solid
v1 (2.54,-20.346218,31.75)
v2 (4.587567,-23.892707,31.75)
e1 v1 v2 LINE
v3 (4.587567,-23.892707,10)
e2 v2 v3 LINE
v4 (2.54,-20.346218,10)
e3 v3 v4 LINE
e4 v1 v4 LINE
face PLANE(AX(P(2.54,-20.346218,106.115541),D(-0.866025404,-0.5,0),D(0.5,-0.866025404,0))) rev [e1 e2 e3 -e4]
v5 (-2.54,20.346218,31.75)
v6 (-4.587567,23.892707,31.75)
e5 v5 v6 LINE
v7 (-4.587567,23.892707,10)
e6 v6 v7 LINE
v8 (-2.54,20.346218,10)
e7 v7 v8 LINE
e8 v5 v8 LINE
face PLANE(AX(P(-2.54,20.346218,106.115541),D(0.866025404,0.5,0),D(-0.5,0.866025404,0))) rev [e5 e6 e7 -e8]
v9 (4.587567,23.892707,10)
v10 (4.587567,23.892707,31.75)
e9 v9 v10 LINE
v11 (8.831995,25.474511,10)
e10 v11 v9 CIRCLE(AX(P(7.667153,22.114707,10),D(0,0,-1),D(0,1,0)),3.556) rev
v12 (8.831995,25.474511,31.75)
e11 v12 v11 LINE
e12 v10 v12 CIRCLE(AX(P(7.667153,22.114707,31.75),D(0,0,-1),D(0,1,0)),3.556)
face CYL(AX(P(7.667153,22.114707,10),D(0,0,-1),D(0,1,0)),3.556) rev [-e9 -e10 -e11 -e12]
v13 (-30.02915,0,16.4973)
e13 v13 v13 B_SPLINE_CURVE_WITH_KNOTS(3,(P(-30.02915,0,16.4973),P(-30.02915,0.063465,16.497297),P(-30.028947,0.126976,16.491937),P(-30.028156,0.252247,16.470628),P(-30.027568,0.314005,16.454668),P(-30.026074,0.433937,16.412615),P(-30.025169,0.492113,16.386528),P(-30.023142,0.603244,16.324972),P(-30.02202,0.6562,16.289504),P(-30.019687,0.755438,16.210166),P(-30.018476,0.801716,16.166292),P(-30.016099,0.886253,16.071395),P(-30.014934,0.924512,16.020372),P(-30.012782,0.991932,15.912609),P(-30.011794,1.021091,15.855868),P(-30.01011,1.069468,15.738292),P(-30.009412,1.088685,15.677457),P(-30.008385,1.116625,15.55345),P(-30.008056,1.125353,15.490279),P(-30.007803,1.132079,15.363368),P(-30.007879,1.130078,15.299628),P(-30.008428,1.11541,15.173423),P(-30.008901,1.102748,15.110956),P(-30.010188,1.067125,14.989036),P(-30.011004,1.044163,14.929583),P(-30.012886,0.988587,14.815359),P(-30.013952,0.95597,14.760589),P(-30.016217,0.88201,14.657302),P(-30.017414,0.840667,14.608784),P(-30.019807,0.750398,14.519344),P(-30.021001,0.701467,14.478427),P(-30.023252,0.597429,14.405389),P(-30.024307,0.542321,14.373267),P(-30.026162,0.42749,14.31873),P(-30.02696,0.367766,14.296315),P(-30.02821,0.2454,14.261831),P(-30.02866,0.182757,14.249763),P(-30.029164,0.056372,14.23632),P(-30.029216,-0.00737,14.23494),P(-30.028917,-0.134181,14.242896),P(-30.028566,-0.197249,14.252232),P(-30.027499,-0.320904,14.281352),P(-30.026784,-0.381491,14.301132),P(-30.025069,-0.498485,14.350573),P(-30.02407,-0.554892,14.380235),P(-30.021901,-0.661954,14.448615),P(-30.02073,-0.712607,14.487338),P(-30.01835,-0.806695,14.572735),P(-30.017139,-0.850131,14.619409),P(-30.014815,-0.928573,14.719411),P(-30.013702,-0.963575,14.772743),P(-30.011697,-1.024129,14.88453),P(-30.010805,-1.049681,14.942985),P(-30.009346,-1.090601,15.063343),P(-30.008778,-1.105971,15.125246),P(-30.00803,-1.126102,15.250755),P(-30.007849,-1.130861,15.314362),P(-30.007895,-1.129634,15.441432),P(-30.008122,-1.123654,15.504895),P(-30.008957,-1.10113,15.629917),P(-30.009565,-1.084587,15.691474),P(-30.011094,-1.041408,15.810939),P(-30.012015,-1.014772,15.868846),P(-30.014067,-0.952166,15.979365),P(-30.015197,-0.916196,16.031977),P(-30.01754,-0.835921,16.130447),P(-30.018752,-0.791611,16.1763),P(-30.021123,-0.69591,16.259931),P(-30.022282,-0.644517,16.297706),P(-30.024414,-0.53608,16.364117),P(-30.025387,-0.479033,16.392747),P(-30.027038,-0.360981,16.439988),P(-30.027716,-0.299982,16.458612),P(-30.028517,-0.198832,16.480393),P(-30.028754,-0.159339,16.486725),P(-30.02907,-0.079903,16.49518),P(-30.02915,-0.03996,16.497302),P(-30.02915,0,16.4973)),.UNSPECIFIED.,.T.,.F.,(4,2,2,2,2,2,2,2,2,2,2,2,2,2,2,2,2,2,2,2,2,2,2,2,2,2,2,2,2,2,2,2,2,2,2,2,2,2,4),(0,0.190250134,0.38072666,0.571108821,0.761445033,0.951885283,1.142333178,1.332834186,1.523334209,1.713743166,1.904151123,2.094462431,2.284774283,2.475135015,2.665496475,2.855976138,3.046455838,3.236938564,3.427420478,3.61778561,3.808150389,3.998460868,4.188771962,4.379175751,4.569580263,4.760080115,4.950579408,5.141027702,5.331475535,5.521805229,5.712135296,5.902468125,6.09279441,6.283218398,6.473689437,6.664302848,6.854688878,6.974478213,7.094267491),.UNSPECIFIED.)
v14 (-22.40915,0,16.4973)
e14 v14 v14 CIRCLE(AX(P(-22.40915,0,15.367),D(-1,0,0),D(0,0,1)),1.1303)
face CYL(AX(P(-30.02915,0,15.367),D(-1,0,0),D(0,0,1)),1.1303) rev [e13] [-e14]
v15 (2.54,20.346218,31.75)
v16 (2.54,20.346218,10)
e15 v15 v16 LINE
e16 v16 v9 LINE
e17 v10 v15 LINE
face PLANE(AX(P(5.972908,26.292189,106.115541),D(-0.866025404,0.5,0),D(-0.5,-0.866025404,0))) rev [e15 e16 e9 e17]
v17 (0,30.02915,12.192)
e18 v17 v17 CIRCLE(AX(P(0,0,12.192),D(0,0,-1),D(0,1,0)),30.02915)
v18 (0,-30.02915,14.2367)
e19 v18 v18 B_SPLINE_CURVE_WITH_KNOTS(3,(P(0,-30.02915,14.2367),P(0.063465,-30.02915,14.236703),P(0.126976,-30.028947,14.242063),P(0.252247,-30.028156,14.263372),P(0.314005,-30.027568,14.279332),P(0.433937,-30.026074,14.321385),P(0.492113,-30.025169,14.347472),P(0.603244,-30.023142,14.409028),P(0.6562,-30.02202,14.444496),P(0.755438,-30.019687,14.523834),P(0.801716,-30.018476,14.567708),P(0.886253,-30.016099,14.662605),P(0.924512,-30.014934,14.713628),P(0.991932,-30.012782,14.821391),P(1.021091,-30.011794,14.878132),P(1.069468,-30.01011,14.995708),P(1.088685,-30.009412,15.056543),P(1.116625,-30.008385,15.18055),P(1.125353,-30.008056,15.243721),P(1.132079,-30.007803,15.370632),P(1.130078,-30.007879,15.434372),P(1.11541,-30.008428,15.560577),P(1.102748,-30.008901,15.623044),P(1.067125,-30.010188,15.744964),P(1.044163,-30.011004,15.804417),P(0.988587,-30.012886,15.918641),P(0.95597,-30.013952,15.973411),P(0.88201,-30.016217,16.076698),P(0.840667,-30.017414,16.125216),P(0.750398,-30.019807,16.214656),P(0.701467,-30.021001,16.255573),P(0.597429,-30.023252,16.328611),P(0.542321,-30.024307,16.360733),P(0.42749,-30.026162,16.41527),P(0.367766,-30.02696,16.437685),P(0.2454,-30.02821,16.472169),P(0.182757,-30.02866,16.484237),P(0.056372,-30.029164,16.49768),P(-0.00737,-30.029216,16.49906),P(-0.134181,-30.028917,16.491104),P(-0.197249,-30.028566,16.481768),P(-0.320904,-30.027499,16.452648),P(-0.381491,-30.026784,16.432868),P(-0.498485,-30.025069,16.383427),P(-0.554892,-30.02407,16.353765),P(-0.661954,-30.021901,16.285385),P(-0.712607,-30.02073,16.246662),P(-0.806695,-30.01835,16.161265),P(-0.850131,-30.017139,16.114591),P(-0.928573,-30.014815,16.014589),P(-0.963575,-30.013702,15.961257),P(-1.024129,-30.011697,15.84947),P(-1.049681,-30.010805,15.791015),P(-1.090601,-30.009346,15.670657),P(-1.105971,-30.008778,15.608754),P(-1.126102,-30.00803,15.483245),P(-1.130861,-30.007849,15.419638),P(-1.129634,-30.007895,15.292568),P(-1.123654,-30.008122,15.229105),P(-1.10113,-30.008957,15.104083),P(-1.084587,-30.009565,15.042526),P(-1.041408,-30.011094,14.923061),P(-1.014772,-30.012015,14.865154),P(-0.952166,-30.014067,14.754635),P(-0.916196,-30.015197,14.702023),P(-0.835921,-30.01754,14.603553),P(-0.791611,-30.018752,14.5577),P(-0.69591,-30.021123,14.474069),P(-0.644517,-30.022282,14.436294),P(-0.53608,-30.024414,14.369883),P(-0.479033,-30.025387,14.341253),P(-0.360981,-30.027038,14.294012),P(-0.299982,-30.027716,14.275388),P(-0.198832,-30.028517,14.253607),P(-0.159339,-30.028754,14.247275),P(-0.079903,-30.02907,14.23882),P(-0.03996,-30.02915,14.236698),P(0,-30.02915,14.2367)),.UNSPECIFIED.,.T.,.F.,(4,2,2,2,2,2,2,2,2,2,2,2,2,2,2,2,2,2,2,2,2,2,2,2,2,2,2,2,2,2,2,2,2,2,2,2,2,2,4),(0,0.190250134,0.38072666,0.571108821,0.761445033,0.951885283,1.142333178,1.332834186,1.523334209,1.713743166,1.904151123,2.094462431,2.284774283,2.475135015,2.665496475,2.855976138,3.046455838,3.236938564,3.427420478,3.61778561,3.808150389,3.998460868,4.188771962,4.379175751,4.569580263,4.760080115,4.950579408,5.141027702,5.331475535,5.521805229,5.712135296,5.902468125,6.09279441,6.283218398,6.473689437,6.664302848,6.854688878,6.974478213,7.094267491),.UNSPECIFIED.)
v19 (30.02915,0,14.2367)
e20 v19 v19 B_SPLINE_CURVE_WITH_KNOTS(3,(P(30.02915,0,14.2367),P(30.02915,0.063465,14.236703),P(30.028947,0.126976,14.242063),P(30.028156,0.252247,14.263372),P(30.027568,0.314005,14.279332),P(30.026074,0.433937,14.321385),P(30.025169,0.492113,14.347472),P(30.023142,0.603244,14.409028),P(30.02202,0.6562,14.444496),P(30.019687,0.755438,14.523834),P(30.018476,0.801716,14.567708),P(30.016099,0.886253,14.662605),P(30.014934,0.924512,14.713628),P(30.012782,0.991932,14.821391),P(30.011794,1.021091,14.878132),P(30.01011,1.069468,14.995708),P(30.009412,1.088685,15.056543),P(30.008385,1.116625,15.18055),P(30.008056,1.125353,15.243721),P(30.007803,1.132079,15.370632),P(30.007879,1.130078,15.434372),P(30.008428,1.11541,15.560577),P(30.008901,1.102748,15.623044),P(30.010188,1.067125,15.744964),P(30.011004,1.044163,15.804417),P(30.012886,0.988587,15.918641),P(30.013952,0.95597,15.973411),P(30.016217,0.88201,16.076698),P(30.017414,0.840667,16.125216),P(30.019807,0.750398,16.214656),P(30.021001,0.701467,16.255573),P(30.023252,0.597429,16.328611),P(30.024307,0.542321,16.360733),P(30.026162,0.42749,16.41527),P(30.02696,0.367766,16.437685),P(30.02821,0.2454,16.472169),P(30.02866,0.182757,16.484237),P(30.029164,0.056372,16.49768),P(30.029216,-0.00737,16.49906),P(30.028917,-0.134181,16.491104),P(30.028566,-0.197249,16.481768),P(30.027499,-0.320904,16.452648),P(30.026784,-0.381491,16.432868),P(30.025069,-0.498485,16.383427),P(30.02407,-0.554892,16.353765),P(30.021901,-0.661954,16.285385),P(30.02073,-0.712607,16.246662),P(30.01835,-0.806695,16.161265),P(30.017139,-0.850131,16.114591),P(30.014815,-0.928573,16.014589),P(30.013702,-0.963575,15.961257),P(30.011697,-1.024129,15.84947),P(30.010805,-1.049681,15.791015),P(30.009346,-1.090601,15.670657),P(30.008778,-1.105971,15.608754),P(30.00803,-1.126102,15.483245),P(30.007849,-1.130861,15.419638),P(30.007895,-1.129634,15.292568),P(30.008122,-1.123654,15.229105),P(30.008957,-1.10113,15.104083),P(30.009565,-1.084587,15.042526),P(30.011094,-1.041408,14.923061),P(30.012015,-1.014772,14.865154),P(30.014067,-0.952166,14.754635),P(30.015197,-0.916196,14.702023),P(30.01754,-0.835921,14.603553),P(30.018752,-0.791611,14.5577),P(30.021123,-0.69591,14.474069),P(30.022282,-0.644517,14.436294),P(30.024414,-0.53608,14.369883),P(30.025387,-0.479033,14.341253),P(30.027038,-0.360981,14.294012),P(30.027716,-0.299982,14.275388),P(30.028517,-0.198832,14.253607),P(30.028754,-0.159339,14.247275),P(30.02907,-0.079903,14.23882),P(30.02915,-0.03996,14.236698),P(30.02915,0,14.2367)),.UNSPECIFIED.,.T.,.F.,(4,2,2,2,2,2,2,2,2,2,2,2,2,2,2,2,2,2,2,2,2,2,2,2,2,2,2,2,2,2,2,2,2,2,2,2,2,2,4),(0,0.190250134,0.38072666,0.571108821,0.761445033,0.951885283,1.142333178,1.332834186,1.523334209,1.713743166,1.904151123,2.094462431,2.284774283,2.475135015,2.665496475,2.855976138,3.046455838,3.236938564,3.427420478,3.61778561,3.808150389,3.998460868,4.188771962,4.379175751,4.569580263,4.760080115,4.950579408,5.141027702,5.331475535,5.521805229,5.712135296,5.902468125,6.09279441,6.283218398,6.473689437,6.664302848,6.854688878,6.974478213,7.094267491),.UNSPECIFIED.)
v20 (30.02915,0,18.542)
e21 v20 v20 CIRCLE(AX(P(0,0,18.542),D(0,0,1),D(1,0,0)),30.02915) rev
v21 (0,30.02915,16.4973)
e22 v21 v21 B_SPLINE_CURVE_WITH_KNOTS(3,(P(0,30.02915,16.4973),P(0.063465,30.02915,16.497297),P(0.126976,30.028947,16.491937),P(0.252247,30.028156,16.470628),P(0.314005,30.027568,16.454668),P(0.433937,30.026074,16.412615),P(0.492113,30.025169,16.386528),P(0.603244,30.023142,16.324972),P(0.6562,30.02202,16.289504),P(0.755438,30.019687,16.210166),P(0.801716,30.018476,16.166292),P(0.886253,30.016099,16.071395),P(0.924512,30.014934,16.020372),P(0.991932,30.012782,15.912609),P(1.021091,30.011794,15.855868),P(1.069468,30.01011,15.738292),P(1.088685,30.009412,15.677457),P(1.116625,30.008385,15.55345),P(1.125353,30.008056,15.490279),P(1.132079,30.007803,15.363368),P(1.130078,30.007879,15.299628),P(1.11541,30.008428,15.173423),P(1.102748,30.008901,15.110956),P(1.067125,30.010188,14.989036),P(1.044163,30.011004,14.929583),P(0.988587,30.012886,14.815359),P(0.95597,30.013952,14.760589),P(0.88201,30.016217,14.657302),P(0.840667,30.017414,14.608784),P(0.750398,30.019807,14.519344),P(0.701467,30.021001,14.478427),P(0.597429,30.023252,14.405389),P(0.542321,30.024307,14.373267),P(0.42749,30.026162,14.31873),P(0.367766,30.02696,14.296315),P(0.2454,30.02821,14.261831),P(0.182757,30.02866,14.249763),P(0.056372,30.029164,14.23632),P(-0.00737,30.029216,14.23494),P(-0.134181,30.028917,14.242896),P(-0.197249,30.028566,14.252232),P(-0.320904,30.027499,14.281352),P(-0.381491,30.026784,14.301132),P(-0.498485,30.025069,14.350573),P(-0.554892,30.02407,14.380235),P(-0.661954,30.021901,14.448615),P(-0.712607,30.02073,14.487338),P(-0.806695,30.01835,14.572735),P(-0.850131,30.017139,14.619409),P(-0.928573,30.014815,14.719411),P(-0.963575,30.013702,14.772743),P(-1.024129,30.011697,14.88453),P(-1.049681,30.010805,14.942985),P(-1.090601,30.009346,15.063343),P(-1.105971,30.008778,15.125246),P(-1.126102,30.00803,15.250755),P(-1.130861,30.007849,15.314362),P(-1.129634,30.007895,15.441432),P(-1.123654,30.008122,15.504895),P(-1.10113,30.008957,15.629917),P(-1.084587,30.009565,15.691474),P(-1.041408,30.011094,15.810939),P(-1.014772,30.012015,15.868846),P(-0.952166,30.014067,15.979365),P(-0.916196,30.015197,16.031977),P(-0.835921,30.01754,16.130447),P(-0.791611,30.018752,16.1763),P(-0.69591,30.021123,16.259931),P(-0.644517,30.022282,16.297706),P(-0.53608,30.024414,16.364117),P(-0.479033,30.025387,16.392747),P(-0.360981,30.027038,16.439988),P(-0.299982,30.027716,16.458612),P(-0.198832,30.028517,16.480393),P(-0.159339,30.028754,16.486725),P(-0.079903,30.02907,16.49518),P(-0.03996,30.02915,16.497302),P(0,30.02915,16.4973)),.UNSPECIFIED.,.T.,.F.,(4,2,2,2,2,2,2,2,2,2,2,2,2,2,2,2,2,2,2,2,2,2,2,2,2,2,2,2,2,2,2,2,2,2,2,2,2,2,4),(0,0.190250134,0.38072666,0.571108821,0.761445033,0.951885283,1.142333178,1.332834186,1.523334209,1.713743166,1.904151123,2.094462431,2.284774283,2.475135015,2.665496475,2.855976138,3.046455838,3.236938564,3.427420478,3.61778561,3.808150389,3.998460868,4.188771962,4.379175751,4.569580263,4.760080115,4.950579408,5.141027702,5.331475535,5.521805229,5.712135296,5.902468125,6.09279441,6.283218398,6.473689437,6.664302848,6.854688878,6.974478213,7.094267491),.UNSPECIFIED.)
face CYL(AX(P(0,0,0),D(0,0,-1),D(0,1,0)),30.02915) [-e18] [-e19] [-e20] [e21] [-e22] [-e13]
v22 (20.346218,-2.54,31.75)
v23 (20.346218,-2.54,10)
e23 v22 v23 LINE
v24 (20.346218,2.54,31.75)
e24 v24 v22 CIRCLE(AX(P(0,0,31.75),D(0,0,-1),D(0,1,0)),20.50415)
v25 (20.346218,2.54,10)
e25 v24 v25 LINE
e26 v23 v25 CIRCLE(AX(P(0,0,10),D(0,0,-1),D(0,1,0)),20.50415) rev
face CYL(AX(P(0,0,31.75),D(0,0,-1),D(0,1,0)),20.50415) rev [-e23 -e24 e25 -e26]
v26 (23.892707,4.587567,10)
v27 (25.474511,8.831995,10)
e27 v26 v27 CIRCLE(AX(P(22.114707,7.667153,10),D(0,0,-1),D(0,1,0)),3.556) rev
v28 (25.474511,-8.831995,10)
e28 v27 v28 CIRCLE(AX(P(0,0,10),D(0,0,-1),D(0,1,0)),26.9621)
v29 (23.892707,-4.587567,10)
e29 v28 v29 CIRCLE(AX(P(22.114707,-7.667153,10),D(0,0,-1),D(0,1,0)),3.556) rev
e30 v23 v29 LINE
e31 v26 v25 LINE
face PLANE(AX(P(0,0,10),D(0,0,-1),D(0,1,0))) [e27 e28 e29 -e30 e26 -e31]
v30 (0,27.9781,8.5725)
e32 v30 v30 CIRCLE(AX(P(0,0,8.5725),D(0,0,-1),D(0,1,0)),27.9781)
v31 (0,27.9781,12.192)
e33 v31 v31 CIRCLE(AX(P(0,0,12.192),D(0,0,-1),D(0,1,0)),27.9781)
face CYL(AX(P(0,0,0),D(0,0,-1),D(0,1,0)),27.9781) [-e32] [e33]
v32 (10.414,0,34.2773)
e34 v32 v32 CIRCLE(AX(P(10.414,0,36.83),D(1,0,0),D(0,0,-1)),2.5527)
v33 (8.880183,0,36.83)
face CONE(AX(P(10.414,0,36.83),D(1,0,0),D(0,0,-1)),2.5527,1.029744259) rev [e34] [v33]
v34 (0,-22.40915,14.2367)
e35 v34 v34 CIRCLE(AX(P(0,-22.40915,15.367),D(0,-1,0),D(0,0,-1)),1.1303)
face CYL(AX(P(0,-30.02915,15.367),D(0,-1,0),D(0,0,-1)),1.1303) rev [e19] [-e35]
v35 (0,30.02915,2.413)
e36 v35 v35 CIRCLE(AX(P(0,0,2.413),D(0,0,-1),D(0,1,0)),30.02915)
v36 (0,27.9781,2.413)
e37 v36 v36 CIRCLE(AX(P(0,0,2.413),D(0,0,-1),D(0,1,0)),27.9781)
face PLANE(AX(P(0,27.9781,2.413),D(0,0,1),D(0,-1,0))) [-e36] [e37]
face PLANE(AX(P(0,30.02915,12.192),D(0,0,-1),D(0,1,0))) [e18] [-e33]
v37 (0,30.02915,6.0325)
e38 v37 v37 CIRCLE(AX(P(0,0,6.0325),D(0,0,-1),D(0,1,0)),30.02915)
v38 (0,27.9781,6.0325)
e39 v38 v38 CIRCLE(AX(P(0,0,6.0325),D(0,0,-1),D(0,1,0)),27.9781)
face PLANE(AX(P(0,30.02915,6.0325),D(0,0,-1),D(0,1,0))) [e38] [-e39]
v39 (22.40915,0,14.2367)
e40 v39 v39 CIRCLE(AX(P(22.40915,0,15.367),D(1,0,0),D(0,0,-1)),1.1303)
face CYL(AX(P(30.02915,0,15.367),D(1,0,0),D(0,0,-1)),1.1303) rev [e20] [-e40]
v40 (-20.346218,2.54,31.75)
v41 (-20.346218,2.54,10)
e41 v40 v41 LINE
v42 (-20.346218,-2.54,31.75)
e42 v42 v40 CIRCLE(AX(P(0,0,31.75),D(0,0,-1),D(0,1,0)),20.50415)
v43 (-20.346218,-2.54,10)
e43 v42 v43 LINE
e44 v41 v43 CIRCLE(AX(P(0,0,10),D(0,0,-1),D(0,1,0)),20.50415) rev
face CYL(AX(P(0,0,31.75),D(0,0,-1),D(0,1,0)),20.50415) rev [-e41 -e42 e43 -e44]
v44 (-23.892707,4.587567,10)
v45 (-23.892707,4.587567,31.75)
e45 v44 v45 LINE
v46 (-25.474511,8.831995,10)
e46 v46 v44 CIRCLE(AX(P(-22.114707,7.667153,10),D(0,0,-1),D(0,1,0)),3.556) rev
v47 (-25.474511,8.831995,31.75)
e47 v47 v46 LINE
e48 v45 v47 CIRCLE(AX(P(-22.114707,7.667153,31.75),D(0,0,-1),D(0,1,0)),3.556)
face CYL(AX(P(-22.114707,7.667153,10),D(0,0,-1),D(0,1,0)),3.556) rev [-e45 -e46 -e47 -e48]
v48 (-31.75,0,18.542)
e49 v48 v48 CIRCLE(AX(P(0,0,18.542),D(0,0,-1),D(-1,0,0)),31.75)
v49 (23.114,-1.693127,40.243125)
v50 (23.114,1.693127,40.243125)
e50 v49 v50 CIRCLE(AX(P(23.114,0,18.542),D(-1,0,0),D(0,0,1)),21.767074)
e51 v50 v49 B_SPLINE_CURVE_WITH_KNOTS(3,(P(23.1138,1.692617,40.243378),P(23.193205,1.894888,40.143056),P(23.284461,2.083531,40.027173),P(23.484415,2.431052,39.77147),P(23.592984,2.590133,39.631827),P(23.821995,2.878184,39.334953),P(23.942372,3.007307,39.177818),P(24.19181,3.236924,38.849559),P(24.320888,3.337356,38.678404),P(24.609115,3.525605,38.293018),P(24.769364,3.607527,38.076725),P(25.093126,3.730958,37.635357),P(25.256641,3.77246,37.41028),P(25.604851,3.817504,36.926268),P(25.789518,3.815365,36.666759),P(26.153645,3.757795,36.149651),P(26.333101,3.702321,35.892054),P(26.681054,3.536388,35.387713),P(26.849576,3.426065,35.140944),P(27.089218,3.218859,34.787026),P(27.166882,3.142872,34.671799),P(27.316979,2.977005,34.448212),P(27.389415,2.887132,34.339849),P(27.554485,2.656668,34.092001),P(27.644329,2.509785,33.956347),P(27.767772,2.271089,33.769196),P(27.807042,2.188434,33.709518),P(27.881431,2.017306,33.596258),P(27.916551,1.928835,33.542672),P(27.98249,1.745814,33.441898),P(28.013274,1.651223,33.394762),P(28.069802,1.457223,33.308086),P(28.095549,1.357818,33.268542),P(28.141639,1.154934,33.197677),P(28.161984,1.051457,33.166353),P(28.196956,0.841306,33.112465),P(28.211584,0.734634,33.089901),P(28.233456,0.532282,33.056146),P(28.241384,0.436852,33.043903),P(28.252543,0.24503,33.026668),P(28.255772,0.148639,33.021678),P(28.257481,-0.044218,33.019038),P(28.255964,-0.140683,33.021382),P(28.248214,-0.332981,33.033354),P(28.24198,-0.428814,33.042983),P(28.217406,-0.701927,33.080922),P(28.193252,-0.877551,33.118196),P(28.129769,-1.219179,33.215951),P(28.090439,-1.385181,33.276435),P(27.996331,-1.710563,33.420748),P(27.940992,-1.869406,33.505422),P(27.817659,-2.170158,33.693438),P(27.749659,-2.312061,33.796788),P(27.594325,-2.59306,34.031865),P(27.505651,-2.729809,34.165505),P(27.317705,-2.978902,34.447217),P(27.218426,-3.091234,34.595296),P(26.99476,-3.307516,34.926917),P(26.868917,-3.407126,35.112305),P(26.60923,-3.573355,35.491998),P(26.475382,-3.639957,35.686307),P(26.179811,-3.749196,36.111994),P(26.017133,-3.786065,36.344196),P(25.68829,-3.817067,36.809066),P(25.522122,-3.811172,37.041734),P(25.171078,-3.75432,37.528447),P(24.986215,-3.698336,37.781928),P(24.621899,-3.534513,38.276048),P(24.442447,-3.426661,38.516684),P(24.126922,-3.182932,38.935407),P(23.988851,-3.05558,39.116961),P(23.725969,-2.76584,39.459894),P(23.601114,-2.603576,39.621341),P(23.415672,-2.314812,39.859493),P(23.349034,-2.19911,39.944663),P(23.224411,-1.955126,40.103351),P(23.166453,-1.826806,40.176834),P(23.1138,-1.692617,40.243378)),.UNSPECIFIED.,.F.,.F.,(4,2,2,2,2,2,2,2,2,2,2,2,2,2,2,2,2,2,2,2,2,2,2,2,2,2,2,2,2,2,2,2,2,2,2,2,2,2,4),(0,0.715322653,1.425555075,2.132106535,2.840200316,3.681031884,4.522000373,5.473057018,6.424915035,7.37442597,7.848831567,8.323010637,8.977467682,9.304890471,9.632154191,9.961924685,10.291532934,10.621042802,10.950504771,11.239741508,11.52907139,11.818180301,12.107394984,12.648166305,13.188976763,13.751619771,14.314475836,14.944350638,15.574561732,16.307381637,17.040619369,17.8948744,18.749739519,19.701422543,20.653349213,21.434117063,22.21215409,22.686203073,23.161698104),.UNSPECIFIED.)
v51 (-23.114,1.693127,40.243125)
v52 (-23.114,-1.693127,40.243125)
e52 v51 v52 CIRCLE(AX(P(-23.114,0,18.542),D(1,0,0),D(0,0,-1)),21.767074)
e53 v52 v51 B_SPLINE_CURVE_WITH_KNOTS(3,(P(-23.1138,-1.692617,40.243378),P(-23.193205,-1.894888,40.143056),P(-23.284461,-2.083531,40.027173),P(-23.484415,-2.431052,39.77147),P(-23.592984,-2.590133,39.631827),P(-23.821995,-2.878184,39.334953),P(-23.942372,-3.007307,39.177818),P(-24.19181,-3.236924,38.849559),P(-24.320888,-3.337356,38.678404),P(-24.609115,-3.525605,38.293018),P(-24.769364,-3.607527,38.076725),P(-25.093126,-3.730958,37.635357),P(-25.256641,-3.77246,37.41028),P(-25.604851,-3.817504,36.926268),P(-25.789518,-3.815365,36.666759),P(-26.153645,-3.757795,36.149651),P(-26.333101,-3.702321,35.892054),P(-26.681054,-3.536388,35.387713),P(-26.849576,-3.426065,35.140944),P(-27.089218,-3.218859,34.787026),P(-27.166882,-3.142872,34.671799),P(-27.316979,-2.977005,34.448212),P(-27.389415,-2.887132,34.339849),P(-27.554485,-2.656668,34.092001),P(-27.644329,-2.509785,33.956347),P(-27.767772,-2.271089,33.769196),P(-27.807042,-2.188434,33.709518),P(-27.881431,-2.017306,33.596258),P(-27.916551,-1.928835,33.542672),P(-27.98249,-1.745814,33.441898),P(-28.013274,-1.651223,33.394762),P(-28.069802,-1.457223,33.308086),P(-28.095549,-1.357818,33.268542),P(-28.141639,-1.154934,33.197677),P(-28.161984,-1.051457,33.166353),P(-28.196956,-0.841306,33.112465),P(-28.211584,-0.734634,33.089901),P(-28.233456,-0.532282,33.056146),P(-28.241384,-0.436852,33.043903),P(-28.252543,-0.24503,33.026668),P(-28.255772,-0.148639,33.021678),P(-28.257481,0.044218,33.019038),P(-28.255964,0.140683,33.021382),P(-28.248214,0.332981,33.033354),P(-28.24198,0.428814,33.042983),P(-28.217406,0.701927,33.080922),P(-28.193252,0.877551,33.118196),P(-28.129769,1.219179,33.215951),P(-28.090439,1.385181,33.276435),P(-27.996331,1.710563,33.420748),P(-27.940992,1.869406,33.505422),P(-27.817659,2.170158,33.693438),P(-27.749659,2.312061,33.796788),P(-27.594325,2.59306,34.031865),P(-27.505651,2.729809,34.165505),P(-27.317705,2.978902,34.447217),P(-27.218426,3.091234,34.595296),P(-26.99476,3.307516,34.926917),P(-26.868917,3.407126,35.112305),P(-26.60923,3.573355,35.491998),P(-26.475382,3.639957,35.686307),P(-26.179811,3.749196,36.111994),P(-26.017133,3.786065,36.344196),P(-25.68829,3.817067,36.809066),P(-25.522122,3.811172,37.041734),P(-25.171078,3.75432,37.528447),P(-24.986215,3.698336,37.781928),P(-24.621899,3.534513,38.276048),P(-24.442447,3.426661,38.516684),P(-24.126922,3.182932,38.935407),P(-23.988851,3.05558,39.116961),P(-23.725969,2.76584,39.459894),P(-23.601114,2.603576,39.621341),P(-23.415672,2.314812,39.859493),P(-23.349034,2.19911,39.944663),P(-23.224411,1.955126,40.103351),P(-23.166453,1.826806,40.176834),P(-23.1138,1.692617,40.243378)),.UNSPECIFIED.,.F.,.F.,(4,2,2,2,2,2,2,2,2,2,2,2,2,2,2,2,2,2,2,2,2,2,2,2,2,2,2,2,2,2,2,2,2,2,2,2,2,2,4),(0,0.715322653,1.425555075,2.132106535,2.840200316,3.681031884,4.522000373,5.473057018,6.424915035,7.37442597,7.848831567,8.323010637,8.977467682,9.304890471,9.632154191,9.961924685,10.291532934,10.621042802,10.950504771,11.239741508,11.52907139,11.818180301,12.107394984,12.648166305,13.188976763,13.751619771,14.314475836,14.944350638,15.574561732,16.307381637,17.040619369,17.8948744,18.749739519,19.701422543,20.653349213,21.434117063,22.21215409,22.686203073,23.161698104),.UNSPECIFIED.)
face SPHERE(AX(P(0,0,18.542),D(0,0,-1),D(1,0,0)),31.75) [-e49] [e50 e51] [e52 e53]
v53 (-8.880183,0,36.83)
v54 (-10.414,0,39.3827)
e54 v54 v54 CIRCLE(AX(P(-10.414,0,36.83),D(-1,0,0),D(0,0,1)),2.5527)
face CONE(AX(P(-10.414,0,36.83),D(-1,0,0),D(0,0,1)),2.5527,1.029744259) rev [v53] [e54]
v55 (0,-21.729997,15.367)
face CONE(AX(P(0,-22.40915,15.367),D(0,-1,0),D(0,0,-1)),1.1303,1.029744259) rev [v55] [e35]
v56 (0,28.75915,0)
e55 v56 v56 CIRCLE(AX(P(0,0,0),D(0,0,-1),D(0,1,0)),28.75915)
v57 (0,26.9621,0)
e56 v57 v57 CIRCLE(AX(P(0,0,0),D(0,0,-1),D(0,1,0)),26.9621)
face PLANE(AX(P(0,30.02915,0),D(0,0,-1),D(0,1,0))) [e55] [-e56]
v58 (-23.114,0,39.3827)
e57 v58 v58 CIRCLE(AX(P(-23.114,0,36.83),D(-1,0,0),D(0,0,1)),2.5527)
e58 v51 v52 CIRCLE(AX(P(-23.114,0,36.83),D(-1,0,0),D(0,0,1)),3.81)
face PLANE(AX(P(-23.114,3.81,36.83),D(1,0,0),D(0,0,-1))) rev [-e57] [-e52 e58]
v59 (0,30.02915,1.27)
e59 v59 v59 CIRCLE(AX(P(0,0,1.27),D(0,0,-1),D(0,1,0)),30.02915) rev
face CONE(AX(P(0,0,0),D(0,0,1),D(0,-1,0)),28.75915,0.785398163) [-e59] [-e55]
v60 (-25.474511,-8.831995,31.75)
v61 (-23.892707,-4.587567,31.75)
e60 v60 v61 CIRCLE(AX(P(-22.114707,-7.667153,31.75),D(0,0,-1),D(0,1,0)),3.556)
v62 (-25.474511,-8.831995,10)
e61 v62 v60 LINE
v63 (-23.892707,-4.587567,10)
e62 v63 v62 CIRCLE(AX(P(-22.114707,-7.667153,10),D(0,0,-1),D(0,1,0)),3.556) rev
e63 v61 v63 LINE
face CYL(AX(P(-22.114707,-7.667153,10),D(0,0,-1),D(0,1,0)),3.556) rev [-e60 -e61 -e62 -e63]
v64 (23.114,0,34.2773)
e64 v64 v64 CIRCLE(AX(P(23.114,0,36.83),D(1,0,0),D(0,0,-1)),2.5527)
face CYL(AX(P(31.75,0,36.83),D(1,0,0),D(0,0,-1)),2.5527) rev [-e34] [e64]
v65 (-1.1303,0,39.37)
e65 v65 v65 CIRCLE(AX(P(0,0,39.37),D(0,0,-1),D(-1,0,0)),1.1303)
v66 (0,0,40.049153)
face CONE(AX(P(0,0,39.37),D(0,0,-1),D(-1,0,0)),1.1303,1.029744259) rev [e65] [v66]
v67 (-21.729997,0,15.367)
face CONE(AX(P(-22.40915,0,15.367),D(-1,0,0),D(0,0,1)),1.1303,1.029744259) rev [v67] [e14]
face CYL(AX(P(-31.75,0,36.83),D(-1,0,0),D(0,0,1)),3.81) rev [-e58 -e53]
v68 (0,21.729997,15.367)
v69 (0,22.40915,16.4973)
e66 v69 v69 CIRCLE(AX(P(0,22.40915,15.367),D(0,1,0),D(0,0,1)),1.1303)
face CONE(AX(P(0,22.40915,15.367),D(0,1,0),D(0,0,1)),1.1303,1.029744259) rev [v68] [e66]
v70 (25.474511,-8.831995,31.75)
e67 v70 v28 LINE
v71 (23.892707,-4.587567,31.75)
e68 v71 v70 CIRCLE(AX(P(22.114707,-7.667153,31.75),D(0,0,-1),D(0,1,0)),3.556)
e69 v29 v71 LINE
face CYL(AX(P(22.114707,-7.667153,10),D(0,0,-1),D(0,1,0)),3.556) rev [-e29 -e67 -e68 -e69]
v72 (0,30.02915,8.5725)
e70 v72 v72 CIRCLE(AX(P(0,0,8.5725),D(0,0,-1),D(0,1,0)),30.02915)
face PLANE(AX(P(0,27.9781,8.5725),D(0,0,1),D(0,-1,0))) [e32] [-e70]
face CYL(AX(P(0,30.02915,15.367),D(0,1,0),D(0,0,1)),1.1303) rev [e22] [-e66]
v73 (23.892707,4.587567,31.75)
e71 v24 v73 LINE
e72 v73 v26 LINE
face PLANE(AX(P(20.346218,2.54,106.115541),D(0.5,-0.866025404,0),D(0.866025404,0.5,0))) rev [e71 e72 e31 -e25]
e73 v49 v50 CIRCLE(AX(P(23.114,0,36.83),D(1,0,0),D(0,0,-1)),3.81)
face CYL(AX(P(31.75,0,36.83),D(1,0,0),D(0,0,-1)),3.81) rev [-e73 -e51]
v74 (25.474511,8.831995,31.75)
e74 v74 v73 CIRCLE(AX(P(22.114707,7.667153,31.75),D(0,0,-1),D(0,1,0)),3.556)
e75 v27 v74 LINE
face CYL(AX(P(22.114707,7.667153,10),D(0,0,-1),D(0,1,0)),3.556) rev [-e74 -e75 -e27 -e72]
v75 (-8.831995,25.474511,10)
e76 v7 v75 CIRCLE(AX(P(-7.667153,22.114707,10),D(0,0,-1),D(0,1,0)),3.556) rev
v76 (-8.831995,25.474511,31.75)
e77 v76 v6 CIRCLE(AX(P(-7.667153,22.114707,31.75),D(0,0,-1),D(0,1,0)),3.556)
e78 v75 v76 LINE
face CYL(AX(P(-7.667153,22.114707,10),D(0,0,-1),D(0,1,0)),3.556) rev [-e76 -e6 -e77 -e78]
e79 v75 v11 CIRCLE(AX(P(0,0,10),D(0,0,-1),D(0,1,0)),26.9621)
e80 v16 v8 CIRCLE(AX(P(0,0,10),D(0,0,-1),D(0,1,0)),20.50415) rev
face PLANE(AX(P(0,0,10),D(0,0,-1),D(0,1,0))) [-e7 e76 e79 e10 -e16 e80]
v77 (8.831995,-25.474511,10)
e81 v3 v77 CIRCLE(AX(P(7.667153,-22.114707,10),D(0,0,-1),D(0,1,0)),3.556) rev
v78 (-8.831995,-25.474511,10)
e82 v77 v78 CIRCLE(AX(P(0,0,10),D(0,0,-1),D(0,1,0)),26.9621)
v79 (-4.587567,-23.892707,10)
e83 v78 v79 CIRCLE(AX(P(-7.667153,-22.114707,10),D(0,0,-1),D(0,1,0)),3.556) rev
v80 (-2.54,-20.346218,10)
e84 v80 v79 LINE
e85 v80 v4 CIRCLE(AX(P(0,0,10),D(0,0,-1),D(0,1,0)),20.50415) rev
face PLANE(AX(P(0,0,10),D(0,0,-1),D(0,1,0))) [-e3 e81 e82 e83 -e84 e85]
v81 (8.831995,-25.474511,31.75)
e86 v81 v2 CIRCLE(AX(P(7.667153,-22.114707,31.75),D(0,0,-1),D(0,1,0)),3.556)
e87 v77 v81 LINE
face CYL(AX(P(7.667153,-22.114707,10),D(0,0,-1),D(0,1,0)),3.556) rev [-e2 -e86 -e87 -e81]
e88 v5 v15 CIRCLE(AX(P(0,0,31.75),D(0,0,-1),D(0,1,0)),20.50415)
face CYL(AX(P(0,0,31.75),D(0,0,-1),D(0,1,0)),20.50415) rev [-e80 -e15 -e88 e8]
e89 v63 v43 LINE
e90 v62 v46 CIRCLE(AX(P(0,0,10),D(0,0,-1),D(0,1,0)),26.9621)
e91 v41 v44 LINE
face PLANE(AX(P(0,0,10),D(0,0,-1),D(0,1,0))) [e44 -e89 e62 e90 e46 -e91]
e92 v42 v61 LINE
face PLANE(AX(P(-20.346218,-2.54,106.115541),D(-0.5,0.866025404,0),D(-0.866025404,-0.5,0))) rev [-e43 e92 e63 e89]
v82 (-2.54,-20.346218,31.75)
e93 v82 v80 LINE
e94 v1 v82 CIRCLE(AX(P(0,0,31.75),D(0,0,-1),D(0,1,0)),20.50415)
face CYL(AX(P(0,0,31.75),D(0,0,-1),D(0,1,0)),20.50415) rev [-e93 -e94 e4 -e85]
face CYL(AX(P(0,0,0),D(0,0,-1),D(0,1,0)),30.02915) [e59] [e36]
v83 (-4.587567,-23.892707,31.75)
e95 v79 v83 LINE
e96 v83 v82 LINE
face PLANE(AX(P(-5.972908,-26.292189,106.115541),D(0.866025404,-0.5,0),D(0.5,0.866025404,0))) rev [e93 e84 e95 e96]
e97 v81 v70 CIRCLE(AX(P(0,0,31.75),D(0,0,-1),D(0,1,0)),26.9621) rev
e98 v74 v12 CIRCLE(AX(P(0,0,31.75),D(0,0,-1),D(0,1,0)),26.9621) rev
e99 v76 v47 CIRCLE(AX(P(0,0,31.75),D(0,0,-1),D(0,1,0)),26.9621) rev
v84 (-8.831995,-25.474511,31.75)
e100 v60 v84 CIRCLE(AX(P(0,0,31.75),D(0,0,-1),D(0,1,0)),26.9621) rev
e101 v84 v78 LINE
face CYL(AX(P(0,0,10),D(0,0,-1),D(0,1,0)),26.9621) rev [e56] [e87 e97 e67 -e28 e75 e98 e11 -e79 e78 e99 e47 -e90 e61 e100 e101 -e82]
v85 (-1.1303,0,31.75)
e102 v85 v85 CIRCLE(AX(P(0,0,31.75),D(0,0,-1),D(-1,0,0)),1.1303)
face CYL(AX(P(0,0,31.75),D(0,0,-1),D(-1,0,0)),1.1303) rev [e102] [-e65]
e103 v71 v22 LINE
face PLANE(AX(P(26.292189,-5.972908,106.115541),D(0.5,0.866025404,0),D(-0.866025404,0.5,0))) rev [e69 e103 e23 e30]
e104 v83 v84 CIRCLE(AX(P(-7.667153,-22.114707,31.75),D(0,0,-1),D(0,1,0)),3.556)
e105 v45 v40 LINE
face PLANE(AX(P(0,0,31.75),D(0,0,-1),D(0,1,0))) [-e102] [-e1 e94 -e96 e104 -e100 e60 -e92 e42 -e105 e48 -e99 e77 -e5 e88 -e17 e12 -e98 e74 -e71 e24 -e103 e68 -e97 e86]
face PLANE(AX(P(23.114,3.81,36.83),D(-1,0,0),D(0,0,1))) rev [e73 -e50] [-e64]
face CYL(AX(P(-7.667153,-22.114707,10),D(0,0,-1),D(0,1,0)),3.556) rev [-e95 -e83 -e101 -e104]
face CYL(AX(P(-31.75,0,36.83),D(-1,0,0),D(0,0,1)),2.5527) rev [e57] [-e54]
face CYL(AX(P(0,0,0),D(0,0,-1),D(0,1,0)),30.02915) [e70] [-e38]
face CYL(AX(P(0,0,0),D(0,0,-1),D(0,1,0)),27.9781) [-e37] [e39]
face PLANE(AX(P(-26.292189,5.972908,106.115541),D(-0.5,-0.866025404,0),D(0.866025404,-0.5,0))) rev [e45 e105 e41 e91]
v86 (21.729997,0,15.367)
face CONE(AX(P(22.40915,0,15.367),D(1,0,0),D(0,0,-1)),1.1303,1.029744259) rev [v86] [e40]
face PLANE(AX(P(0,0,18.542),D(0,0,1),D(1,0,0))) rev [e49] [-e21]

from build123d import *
from build123d.topology import SkipClean

# Parameters (mm, degrees)
F_4_40_TAPPED_HOLE1_D               = 2.2606
F_4_40_TAPPED_HOLE1_DEPTH           = 7.62
F_4_40_TAPPED_HOLE1_TIP             = 0.679152758
F_4_40_TAPPED_HOLE1_ON_FACE_2_D     = 2.2606
F_4_40_TAPPED_HOLE1_ON_FACE_2_DEPTH = 7.62
F_4_40_TAPPED_HOLE1_ON_FACE_2_TIP   = 0.679152758
F_4_40_TAPPED_HOLE1_ON_FACE_3_D     = 2.2606
F_4_40_TAPPED_HOLE1_ON_FACE_3_DEPTH = 7.62
F_4_40_TAPPED_HOLE1_ON_FACE_3_TIP   = 0.679152758
F_4_40_TAPPED_HOLE1_ON_FACE_4_D     = 2.2606
F_4_40_TAPPED_HOLE1_ON_FACE_4_DEPTH = 7.62
F_4_40_TAPPED_HOLE1_ON_FACE_4_TIP   = 0.679152758
SKETCH10_R                          = 20.50415
CUT_EXTRUDE3_DEPTH                  = 31.75
F_4_40_TAPPED_HOLE2_D               = 2.2606
F_4_40_TAPPED_HOLE2_DEPTH           = 7.62
F_4_40_TAPPED_HOLE2_TIP             = 0.679152758
CHAMFER1_SIZE                       = 1.27
SKETCH23_R                          = 26.9621
CUT_EXTRUDE6_DEPTH                  = 10
CUT_EXTRUDE7_DEPTH                  = 21.75
FILLET2_R                           = 3.556


# Read off the part's stored shape, not the designer's step: AdvancedHole3
with BuildPart() as part:
    # Sketch2 → Revolve1 (revolve)
    with BuildSketch(Plane(origin=(0, 0, 0), x_dir=(0, 0, -1), z_dir=(1, 0, 0))):
        Polygon((-18.542, 30.02915), (-12.192, 30.02915), (-12.192, 27.9781), (-8.5725, 27.9781), (-8.5725, 30.02915), (-6.0325, 30.02915), (-6.0325, 27.9781), (-2.413, 27.9781), (-2.413, 30.02915), (0, 30.02915), (0, 0), (-18.542, 0), align=None)
    revolve(axis=Axis((0, 0, 0), (0, 0, 1)))

    # #4-40 Tapped Hole1
    with Locations(Plane(origin=(0, -30.02915, 15.367), x_dir=(0, 0, -1), z_dir=(0, -1, 0))):
        with Locations((0, 0)):
            Hole(F_4_40_TAPPED_HOLE1_D / 2, depth=F_4_40_TAPPED_HOLE1_DEPTH)
            with Locations((0, 0, -(F_4_40_TAPPED_HOLE1_DEPTH + F_4_40_TAPPED_HOLE1_TIP / 2))):  # 118° drill point
                Cone(0, F_4_40_TAPPED_HOLE1_D / 2, F_4_40_TAPPED_HOLE1_TIP, mode=Mode.SUBTRACT)

    # #4-40 Tapped Hole1 on face 2
    with Locations(Plane(origin=(30.02915, 0, 15.367), x_dir=(0, 0, 1), z_dir=(1, 0, 0))):
        with Locations((0, 0)):
            Hole(F_4_40_TAPPED_HOLE1_ON_FACE_2_D / 2, depth=F_4_40_TAPPED_HOLE1_ON_FACE_2_DEPTH)
            with Locations((0, 0, -(F_4_40_TAPPED_HOLE1_ON_FACE_2_DEPTH + F_4_40_TAPPED_HOLE1_ON_FACE_2_TIP / 2))):  # 118° drill point
                Cone(0, F_4_40_TAPPED_HOLE1_ON_FACE_2_D / 2, F_4_40_TAPPED_HOLE1_ON_FACE_2_TIP, mode=Mode.SUBTRACT)

    # #4-40 Tapped Hole1 on face 3
    with Locations(Plane(origin=(-30.02915, 0, 15.367), x_dir=(0, 0, -1), z_dir=(-1, 0, 0))):
        with Locations((0, 0)):
            Hole(F_4_40_TAPPED_HOLE1_ON_FACE_3_D / 2, depth=F_4_40_TAPPED_HOLE1_ON_FACE_3_DEPTH)
            with Locations((0, 0, -(F_4_40_TAPPED_HOLE1_ON_FACE_3_DEPTH + F_4_40_TAPPED_HOLE1_ON_FACE_3_TIP / 2))):  # 118° drill point
                Cone(0, F_4_40_TAPPED_HOLE1_ON_FACE_3_D / 2, F_4_40_TAPPED_HOLE1_ON_FACE_3_TIP, mode=Mode.SUBTRACT)

    # #4-40 Tapped Hole1 on face 4
    with Locations(Plane(origin=(0, 30.02915, 15.367), x_dir=(0, 0, 1), z_dir=(0, 1, 0))):
        with Locations((0, 0)):
            Hole(F_4_40_TAPPED_HOLE1_ON_FACE_4_D / 2, depth=F_4_40_TAPPED_HOLE1_ON_FACE_4_DEPTH)
            with Locations((0, 0, -(F_4_40_TAPPED_HOLE1_ON_FACE_4_DEPTH + F_4_40_TAPPED_HOLE1_ON_FACE_4_TIP / 2))):  # 118° drill point
                Cone(0, F_4_40_TAPPED_HOLE1_ON_FACE_4_D / 2, F_4_40_TAPPED_HOLE1_ON_FACE_4_TIP, mode=Mode.SUBTRACT)

    # Sketch6 → Revolve2 (revolve)
    with BuildSketch(Plane(origin=(0, 0, 0), x_dir=(1, 0, 0), z_dir=(0, 1, 0)), mode=Mode.PRIVATE) as revolve2_sk:
        with BuildLine():
            Line((0, -18.542), (31.75, -18.542))
            ThreePointArc((31.75, -18.542), (22.450640303, -40.992640303), (0, -50.292))
            Line((0, -50.292), (0, -18.542))
        make_face()
    revolve(revolve2_sk.sketch.rotate(Axis((0, 0, 18.542), (0, 0, 1)), 90), axis=Axis((0, 0, 18.542), (0, 0, 1)))

    # Sketch10 → Cut-Extrude3 (cut)
    with BuildSketch(Plane(origin=(0, 0, 0), x_dir=(-1, 0, 0), z_dir=(0, 0, -1))):
        with Locations(Location((0, 0, 0), (0, 0, 90))):
            Circle(SKETCH10_R)
    extrude(amount=-CUT_EXTRUDE3_DEPTH, mode=Mode.SUBTRACT)

    # #4-40 Tapped Hole2
    with Locations(Plane(origin=(0, 0, 31.75), x_dir=(-1, 0, 0), z_dir=(0, 0, -1))):
        with Locations((0, 0)):
            Hole(F_4_40_TAPPED_HOLE2_D / 2, depth=F_4_40_TAPPED_HOLE2_DEPTH)
            with Locations((0, 0, -(F_4_40_TAPPED_HOLE2_DEPTH + F_4_40_TAPPED_HOLE2_TIP / 2))):  # 118° drill point
                Cone(0, F_4_40_TAPPED_HOLE2_D / 2, F_4_40_TAPPED_HOLE2_TIP, mode=Mode.SUBTRACT)

    # Chamfer1
    chamfer1_edges = [part.edges().sort_by_distance(p)[0] for p in [
        (0, -30.02915, 0),
    ]]
    chamfer(chamfer1_edges, length=CHAMFER1_SIZE)

    # AdvancedHole3 outline → AdvancedHole3 (revolve, cut)
    with BuildSketch(Plane.YX.offset(-36.83)):
        Polygon((3.81, 28.256858344), (0, 28.256858344), (0, 8.880183098), (2.5527, 10.414), (2.5527, 23.114), (3.81, 23.114), align=None)
    advancedhole3 = revolve(axis=Axis((0, 0, 36.83), (1, 0, 0)), mode=Mode.SUBTRACT)

    # Mirror2: AdvancedHole3 across plane
    add(advancedhole3.mirror(Plane(origin=(0, 0, 0), x_dir=(0, 0, 1), z_dir=(1, 0, 0))), mode=Mode.SUBTRACT)

    # Sketch23 → Cut-Extrude6 (cut)
    with BuildSketch(Plane(origin=(0, 0, 0), x_dir=(-1, 0, 0), z_dir=(0, 0, -1))):
        with Locations(Location((0, 0, 0), (0, 0, 90))):
            Circle(SKETCH23_R)
    extrude(amount=-CUT_EXTRUDE6_DEPTH, mode=Mode.SUBTRACT)

    # Sketch24 → Cut-Extrude7 (cut)
    with SkipClean():  # the faces are left unmerged after this step: merging them gives an invalid solid
        with BuildSketch(Plane(origin=(0, 0, 10), x_dir=(-1, 0, 0), z_dir=(0, 0, -1))):
            with BuildLine():
                Line((-5.972908248, 26.29218902), (-2.54, 20.346217516))
                Line((-2.54, 20.346217516), (2.54, 20.346217516))
                Line((2.54, 20.346217516), (5.972908248, 26.29218902))
                ThreePointArc((5.972908248, 26.29218902), (19.065083745, 19.065083745), (26.29218902, 5.972908248))
                Line((26.29218902, 5.972908248), (20.346217516, 2.54))
                Line((20.346217516, 2.54), (20.346217516, -2.54))
                Line((20.346217516, -2.54), (26.29218902, -5.972908248))
                ThreePointArc((26.29218902, -5.972908248), (19.065083745, -19.065083745), (5.972908248, -26.29218902))
                Line((5.972908248, -26.29218902), (2.54, -20.346217516))
                Line((2.54, -20.346217516), (-2.54, -20.346217516))
                Line((-2.54, -20.346217516), (-5.972908248, -26.29218902))
                ThreePointArc((-5.972908248, -26.29218902), (-19.065083745, -19.065083745), (-26.29218902, -5.972908248))
                Line((-26.29218902, -5.972908248), (-20.346217516, -2.54))
                Line((-20.346217516, -2.54), (-20.346217516, 2.54))
                Line((-20.346217516, 2.54), (-26.29218902, 5.972908248))
                ThreePointArc((-26.29218902, 5.972908248), (-19.065083745, 19.065083745), (-5.972908248, 26.29218902))
            make_face()
        extrude(amount=-CUT_EXTRUDE7_DEPTH, mode=Mode.SUBTRACT)

    # Fillet2
    fillet2_edges = [part.edges().sort_by_distance(p)[0] for p in [
        (26.29218902, 5.972908248, 20.875),
        (5.972908248, 26.29218902, 20.875),
        (-5.972908248, 26.29218902, 20.875),
        (-26.29218902, 5.972908248, 20.875),
        (-26.29218902, -5.972908248, 20.875),
        (-5.972908248, -26.29218902, 20.875),
        (5.972908248, -26.29218902, 20.875),
        (26.29218902, -5.972908248, 20.875),
    ]]
    fillet(fillet2_edges, radius=FILLET2_R)


solid = part.part
